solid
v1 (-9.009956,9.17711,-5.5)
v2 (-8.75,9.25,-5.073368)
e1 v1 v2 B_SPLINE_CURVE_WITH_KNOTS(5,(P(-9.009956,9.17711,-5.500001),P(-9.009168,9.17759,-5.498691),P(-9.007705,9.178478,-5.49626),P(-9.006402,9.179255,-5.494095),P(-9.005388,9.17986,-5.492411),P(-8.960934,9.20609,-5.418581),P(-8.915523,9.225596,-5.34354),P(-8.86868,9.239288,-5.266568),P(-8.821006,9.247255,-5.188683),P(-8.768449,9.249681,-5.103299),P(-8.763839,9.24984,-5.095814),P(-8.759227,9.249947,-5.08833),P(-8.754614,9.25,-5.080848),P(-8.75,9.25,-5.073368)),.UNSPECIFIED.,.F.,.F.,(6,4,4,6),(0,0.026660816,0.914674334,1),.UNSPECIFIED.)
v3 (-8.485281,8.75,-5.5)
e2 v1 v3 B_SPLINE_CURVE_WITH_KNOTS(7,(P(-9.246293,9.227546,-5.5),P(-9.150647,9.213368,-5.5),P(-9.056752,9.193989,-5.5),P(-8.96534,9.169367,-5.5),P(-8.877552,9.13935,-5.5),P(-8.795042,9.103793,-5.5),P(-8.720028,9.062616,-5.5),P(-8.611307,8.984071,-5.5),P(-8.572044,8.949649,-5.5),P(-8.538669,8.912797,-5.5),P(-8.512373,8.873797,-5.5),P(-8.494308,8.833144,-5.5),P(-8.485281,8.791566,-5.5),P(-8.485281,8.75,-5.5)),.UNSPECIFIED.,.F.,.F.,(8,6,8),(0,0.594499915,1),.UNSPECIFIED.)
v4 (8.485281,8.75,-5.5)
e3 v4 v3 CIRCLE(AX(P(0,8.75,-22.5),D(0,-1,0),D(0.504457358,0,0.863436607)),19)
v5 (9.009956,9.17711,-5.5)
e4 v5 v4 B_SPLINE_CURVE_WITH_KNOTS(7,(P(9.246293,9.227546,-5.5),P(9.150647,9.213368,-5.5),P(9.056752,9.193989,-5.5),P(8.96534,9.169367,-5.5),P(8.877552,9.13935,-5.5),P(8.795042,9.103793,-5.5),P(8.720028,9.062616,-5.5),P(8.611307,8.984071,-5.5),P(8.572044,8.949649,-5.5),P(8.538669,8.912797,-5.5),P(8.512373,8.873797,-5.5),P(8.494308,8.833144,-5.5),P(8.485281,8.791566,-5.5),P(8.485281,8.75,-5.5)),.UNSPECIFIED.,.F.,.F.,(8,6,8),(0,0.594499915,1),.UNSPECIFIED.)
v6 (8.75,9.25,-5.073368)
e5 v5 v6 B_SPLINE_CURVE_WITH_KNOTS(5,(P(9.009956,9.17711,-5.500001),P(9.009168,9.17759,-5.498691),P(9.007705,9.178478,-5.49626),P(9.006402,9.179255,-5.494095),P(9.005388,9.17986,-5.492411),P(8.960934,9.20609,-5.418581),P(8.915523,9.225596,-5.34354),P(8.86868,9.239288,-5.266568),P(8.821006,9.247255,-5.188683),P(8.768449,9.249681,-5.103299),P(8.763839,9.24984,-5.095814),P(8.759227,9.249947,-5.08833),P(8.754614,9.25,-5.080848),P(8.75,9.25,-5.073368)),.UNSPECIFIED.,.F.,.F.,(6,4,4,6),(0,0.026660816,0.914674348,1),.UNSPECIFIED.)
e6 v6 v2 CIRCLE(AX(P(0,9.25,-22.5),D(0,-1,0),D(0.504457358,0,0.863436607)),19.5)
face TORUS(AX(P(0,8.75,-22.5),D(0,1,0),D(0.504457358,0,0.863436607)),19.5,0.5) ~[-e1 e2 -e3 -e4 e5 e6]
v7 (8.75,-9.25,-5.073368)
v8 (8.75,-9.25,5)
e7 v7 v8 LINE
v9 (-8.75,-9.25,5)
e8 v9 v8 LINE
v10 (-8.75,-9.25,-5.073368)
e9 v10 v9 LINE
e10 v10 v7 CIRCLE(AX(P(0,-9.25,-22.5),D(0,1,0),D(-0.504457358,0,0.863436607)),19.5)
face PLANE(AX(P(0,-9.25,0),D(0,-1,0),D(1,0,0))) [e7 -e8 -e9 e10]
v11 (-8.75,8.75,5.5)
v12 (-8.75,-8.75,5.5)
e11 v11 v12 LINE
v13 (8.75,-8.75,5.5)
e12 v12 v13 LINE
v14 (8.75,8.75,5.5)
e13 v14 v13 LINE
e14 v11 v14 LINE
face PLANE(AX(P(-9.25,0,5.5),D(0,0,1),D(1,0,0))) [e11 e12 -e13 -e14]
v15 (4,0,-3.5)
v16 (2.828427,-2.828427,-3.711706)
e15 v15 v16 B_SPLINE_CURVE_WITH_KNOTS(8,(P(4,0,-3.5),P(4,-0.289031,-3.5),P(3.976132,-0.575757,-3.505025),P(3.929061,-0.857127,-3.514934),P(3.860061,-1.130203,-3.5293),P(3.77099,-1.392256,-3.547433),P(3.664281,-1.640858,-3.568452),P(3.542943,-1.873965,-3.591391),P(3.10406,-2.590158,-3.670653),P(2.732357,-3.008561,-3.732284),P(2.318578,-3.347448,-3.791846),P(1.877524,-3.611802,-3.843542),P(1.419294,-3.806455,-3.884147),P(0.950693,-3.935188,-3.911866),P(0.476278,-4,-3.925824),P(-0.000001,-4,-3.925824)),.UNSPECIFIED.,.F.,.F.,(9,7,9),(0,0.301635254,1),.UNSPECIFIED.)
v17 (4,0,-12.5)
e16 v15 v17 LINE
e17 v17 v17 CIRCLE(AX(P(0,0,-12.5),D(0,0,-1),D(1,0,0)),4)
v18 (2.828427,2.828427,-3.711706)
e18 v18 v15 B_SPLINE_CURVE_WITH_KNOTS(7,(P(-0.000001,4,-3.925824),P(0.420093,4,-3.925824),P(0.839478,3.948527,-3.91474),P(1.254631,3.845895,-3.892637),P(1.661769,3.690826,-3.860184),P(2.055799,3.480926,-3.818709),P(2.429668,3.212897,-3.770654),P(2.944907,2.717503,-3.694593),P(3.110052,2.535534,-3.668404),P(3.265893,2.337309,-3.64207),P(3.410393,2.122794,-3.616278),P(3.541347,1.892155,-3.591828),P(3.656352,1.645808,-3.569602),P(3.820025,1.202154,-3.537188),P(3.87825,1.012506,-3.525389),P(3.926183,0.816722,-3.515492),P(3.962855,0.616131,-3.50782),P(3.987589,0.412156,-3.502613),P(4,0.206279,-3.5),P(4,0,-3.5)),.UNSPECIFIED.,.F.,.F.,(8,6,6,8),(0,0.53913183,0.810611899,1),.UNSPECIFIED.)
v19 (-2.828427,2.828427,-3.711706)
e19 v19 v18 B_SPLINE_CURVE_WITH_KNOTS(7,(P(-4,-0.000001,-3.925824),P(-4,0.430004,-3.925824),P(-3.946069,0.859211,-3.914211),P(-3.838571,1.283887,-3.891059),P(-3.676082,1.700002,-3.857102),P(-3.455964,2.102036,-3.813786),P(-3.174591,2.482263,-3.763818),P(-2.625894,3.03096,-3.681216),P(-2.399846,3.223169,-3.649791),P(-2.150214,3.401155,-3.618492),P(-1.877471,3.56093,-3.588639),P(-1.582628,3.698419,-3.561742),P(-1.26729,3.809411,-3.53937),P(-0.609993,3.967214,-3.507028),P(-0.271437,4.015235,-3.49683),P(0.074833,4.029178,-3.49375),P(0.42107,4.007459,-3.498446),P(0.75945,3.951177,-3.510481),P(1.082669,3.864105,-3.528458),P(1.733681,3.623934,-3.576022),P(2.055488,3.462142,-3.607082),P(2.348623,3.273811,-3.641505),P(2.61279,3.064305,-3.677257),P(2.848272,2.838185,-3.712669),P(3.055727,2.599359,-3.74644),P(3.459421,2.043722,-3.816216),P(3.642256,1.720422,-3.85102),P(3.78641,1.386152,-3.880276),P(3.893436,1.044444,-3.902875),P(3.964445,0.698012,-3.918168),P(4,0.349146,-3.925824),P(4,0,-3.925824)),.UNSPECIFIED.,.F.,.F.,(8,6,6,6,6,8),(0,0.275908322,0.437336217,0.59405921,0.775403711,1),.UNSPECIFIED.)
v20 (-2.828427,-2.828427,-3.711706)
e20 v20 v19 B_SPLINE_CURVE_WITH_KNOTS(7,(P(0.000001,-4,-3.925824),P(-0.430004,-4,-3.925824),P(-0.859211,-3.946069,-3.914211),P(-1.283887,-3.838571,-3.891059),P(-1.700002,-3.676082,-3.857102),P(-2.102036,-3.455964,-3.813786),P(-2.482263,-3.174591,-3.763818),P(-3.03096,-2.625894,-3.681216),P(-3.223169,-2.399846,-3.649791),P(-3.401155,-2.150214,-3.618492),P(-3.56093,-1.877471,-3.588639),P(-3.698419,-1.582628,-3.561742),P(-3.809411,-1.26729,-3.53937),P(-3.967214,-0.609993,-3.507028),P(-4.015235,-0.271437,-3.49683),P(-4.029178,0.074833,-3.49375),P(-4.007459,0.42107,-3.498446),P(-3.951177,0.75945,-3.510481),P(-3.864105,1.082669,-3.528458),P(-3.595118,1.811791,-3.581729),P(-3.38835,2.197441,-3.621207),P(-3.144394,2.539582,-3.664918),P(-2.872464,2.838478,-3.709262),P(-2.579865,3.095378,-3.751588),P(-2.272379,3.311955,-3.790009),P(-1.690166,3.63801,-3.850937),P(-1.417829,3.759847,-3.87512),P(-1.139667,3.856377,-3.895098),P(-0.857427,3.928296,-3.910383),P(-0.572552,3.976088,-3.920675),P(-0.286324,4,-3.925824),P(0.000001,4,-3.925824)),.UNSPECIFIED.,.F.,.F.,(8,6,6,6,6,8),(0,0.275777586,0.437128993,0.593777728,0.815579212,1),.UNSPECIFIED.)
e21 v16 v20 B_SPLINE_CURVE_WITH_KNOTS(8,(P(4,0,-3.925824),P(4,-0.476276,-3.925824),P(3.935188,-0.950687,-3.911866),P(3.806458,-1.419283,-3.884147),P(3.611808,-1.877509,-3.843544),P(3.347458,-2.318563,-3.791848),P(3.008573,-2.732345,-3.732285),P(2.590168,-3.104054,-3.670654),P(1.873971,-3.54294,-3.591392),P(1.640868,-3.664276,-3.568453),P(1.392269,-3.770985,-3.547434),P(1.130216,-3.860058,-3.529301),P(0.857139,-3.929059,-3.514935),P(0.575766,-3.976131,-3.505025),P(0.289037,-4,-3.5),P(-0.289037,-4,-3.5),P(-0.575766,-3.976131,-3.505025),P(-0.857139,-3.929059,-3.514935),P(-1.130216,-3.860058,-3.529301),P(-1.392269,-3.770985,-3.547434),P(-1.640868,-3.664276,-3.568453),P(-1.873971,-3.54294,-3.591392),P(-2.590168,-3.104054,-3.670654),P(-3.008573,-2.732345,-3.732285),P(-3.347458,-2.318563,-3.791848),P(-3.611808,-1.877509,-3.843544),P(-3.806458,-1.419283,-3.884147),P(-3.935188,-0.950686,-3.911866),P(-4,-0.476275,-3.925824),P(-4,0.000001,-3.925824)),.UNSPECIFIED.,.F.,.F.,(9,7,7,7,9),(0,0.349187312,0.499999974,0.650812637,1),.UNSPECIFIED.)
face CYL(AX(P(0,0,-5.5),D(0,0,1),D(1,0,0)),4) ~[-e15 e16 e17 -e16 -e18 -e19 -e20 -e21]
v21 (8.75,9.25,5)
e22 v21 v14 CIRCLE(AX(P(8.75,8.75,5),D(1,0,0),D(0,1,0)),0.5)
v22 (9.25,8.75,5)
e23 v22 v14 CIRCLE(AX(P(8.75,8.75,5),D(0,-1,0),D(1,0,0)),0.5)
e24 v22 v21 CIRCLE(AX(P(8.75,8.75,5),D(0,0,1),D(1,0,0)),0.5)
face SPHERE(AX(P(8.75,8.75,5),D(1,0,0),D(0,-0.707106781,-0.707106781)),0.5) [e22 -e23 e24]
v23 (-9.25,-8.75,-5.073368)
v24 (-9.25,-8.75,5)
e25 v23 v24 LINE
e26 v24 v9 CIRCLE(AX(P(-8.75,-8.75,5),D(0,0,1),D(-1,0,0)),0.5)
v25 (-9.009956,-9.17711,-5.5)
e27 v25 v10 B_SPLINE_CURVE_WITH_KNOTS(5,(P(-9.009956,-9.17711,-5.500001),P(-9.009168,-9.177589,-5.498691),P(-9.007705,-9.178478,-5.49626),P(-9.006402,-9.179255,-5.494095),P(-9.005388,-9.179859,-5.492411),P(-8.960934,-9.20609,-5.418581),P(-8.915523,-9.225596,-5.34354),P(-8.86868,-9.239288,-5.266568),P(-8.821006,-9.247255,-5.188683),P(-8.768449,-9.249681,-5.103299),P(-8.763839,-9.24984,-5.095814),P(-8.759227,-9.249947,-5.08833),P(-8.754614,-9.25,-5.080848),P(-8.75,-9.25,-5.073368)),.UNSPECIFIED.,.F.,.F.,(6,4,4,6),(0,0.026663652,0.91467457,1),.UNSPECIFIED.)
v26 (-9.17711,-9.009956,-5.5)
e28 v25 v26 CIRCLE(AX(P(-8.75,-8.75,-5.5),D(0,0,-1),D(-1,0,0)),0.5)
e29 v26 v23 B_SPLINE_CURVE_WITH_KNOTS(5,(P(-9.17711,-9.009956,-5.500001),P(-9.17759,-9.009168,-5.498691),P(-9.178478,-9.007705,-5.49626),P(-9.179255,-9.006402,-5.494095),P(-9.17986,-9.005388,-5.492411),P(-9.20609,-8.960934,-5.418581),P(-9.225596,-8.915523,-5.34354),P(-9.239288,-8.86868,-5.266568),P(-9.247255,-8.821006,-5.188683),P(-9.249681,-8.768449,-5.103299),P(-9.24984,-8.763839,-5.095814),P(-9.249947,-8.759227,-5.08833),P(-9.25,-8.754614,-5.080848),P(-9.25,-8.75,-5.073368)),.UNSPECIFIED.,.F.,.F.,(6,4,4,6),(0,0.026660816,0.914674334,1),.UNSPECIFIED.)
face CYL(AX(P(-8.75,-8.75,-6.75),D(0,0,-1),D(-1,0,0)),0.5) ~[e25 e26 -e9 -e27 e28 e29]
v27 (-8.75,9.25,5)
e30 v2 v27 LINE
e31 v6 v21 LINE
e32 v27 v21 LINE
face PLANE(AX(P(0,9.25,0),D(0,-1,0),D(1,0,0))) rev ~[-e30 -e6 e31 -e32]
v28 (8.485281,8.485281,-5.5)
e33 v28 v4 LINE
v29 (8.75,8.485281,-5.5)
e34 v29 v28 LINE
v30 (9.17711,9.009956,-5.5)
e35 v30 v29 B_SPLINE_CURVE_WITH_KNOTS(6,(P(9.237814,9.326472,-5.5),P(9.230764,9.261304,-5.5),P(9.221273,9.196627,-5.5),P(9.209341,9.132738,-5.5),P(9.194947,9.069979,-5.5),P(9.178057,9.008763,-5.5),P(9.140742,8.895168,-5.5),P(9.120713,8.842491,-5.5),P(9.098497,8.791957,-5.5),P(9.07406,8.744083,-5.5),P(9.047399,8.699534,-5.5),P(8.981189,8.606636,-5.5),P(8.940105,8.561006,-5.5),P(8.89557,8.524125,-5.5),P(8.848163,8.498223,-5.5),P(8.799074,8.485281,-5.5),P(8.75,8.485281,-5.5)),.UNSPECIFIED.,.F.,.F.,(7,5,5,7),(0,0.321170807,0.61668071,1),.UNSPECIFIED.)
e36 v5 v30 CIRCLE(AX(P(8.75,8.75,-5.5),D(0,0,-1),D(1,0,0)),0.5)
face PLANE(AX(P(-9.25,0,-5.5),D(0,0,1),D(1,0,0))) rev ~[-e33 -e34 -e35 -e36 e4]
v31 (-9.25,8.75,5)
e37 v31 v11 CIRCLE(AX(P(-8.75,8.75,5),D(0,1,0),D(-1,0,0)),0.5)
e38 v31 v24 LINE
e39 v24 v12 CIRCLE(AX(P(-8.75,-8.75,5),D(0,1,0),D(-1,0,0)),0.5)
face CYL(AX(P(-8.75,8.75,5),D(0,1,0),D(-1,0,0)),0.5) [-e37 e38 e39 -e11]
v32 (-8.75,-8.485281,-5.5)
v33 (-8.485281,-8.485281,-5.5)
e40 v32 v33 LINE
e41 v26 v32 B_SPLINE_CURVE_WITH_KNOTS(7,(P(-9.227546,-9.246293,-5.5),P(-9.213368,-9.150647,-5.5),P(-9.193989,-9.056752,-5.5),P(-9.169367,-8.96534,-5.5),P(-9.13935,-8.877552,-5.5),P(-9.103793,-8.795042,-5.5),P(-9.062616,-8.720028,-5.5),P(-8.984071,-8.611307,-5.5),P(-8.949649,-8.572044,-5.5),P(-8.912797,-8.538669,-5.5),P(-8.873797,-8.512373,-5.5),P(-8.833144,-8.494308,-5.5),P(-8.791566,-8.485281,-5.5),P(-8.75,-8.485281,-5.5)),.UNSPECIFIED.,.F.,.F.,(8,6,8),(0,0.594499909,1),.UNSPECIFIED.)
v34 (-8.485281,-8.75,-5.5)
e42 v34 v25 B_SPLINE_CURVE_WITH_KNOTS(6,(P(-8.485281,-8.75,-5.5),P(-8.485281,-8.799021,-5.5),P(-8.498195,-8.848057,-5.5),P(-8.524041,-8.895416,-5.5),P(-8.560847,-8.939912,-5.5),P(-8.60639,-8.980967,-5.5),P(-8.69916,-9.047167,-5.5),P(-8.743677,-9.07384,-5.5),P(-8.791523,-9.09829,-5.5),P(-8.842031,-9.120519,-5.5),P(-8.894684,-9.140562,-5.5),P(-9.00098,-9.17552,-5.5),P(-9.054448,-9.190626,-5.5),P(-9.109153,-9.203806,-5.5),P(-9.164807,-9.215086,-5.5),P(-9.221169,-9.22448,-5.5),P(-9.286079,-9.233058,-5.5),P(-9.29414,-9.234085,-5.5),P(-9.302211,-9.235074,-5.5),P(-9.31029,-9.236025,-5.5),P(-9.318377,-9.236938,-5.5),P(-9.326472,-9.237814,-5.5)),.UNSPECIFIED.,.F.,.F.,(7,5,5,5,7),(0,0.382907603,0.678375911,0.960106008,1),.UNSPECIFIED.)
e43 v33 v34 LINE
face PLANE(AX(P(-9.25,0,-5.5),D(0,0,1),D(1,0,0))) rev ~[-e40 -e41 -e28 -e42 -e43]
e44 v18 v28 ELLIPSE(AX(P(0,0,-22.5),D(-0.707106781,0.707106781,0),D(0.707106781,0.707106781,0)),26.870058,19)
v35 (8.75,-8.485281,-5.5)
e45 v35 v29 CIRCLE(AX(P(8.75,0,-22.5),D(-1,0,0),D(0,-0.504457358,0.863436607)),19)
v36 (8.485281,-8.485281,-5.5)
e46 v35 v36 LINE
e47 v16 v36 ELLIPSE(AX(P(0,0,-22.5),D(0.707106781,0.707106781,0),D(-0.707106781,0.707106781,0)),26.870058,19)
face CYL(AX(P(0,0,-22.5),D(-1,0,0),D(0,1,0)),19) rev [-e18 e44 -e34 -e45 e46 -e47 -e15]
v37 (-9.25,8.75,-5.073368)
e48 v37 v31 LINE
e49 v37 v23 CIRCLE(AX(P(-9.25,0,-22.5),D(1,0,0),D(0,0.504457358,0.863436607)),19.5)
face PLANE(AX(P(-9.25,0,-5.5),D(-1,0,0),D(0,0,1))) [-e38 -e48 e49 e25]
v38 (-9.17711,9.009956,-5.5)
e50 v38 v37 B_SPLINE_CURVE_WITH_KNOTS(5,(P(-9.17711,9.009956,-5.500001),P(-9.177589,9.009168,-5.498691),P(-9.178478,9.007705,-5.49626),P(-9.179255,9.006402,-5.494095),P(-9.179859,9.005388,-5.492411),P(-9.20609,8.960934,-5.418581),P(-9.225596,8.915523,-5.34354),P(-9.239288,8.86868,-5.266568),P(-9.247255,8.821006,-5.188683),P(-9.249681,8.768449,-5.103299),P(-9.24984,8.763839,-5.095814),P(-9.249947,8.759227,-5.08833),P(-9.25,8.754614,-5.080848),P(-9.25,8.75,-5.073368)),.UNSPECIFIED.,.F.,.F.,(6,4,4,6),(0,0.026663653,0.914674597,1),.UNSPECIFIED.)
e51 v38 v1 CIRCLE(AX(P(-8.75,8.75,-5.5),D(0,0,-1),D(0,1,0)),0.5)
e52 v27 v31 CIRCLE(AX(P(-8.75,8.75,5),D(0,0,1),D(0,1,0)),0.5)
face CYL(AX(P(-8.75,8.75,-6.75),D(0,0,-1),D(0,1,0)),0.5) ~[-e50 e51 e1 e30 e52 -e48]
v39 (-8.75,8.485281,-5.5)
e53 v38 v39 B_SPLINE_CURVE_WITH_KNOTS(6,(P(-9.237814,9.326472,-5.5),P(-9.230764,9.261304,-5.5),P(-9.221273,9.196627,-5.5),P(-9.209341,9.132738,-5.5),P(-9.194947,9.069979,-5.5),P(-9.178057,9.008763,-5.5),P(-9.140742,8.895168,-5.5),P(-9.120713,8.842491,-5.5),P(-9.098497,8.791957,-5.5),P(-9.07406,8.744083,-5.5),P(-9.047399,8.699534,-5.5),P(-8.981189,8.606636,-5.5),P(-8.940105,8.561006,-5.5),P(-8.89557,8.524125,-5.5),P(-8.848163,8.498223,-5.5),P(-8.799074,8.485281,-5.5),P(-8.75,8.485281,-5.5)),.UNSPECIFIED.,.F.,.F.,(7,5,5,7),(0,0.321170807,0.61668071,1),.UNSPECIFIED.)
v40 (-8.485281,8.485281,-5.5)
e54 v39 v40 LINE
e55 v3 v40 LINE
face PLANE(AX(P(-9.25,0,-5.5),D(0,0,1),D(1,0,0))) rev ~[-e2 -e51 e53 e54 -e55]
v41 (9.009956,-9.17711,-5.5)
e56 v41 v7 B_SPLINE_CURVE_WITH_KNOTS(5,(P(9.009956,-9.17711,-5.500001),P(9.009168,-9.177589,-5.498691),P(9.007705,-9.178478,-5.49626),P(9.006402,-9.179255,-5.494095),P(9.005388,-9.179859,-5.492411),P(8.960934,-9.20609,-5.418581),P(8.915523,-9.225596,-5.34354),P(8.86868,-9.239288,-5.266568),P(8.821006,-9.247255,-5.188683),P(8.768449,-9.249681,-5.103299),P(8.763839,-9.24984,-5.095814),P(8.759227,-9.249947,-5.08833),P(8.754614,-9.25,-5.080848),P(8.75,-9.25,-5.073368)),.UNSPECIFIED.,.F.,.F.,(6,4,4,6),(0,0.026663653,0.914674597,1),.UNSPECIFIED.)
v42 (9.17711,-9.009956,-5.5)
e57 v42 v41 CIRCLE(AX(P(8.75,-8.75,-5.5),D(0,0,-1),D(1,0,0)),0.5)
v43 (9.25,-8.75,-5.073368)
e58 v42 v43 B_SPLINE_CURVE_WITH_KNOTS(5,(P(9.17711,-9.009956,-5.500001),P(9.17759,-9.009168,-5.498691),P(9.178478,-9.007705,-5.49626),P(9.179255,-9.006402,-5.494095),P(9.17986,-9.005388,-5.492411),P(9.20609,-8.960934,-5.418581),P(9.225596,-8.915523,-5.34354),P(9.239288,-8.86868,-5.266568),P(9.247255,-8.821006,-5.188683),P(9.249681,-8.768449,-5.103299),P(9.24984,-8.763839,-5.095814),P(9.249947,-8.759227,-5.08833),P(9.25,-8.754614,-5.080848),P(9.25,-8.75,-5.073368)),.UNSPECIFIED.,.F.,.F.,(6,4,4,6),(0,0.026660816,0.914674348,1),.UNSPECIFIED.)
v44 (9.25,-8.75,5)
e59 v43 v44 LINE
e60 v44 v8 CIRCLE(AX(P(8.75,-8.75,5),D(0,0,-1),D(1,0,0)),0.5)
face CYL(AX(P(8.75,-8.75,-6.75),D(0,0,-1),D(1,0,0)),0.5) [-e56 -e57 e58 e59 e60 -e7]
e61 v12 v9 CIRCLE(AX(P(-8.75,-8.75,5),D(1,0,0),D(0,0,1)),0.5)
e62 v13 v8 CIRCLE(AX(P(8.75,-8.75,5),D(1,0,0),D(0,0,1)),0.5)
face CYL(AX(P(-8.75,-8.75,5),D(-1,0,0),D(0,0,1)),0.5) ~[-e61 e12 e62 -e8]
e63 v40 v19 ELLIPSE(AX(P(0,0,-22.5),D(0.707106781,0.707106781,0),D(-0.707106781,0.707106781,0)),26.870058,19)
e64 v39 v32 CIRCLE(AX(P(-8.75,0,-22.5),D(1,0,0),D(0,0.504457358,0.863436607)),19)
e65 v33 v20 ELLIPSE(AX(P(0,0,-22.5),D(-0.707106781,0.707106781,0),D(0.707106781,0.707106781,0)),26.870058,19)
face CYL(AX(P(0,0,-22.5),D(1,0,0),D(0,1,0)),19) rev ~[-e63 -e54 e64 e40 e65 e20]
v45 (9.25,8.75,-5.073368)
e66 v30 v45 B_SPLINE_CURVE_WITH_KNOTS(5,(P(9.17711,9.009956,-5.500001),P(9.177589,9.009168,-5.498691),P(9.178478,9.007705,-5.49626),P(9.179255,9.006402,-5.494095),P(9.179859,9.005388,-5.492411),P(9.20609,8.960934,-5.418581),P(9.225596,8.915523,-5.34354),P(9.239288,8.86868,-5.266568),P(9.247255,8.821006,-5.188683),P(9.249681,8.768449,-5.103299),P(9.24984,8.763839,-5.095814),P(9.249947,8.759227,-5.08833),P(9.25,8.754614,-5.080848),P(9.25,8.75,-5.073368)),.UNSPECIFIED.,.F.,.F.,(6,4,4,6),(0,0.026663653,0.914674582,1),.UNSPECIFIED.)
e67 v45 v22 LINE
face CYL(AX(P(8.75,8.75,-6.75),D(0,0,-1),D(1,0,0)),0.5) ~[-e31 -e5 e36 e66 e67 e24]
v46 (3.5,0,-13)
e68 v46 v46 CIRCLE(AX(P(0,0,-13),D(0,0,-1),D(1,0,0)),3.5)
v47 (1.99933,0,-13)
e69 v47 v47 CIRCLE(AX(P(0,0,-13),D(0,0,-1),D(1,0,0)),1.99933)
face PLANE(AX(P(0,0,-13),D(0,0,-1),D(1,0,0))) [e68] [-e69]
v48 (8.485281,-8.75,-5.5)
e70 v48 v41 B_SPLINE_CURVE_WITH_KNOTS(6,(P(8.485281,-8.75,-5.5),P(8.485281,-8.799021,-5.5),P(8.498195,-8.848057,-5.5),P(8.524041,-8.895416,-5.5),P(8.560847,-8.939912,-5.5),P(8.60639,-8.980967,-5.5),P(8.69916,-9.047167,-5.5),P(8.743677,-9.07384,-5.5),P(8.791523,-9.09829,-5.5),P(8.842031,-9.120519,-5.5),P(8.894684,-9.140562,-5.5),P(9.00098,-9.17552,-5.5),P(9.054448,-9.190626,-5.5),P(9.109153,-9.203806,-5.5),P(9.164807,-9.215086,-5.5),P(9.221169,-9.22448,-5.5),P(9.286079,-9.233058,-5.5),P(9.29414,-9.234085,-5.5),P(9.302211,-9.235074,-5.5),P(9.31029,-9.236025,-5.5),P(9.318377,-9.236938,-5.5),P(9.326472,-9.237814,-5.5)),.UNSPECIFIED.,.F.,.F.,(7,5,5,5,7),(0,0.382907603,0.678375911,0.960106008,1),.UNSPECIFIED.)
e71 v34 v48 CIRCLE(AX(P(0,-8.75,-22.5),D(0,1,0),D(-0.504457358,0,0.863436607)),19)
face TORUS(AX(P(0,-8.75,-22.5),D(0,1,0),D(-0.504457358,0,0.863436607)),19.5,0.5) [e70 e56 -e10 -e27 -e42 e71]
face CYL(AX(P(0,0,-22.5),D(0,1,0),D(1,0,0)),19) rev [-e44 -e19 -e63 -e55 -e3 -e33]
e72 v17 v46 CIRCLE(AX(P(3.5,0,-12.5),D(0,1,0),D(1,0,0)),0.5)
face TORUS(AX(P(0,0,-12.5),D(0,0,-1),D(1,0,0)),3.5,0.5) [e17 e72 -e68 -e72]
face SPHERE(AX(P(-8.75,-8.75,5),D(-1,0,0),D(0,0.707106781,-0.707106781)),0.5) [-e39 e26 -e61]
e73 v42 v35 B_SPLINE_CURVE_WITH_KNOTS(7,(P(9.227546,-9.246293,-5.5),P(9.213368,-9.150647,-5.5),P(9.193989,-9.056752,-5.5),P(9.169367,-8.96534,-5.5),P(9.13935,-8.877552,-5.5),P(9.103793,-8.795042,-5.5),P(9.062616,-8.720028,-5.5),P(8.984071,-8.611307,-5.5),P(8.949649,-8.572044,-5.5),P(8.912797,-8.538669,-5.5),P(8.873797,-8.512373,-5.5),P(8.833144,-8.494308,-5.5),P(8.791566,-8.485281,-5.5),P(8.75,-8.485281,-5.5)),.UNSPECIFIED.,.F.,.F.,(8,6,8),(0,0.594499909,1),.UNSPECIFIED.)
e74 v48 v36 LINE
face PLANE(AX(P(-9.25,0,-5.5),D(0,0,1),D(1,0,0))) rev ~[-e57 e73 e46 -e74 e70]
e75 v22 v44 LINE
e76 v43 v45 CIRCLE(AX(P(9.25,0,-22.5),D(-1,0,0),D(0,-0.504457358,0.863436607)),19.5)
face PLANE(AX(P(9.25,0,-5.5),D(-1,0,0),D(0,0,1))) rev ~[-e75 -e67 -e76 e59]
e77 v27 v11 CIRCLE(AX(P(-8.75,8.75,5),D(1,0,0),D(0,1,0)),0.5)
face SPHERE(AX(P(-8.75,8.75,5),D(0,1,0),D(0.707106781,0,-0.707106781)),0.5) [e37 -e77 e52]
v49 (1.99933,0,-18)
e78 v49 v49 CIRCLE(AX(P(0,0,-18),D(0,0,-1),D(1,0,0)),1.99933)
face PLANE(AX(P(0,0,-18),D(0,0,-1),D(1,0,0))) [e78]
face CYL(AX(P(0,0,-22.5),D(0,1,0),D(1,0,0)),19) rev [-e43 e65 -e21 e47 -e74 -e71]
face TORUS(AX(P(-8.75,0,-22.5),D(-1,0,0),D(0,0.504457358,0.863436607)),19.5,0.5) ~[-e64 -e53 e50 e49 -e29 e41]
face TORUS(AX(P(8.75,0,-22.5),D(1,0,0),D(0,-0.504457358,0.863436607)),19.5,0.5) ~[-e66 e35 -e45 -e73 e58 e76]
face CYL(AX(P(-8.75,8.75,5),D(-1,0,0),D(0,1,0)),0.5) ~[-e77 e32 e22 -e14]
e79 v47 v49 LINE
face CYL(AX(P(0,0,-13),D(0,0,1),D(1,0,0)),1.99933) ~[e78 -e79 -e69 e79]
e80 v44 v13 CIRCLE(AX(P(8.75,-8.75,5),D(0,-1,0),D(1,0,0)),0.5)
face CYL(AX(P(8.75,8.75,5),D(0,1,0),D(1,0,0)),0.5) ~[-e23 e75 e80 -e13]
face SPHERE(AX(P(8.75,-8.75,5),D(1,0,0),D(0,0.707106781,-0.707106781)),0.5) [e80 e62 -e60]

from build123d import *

# Parameters (mm, degrees)
F0_W          = 18.5
F0_H          = 11
F1_DEPTH      = 9.25
F2_DEPTH      = 9.25
F3_R          = 19
F5_DEPTH      = 25.4
F6_DEPTH      = 25.4
F4_R          = 19
F7_DEPTH      = 25.4
F8_DEPTH      = 25.4
F9_R          = 4
F10_DEPTH     = 3.45753
F11_DEPTH     = 7.5
F12_T1_DEPTH  = 11.75
F12_T3_DEPTH  = 17.5
F12_T5_DEPTH  = 17.5
F12_S9_W      = 0.5
F12_S9_H      = 0.5
F12_T10_DEPTH = 0.5
F12_S15_W     = 0.5
F12_S15_H     = 0.5
F12_T16_DEPTH = 0.5
F12_S21_W     = 0.5
F12_S21_H     = 0.5
F12_T22_DEPTH = 0.5
F12_S27_W     = 0.5
F12_S27_H     = 0.5
F12_T28_DEPTH = 0.5
F12_T34_ANGLE = 60.5906744424
F12_T36_ANGLE = 60.5906744424
F12_T38_ANGLE = 60.5906744424
F12_T40_ANGLE = 60.5906744424
F13_R         = 1.9993297739
F14_DEPTH     = 5


# Not quite as in the source:
# - a fillet or chamfer that OpenCascade refuses, or shapes differently, is made with other operations: its cross-section is extruded or revolved along the edge and cut away or added
# - a feature names something its author has since deleted; it is built from what else it names


with BuildPart() as f1:
    # F0 (on Front) → F1 (new body)
    with BuildSketch(Plane.XZ):
        Rectangle(F0_W, F0_H)
    extrude(amount=-F1_DEPTH)

    # F0 (on Front) → F2 (join)
    with BuildSketch(Plane.XZ):
        Rectangle(F0_W, F0_H)
    extrude(amount=F2_DEPTH)

    # F3 (on Front) → F5 (cut)
    with BuildSketch(Plane.XZ):
        with Locations((0, -22.5)):
            Circle(F3_R)
    extrude(amount=-F5_DEPTH, mode=Mode.SUBTRACT)

    # F3 (on Front) → F6 (cut)
    with BuildSketch(Plane.XZ):
        with Locations((0, -22.5)):
            Circle(F3_R)
    extrude(amount=F6_DEPTH, mode=Mode.SUBTRACT)

    # F4 (on Right) → F7 (cut)
    with BuildSketch(Plane.YZ):
        with Locations((0, -22.5)):
            Circle(F4_R)
    extrude(amount=-F7_DEPTH, mode=Mode.SUBTRACT)

    # F4 (on Right) → F8 (cut)
    with BuildSketch(Plane.YZ):
        with Locations((0, -22.5)):
            Circle(F4_R)
    extrude(amount=F8_DEPTH, mode=Mode.SUBTRACT)

    # F9 (on face) → F10 (join)
    with BuildSketch(Plane(origin=(0, 0, -5.5), x_dir=(1, 0, 0), z_dir=(0, 0, -1))):
        Circle(F9_R)
    extrude(amount=-F10_DEPTH)

    # F11 (add): a face of the model
    f11_faces = [f1.faces().sort_by_distance(p)[0] for p in [
        (0, 0, -5.5),
    ]]
    extrude(f11_faces, amount=F11_DEPTH)

    # F12: fillet of radius 0.5 on 13 edges, made by hand

    # F12_s2 → F12_t1 (cut)
    with BuildSketch(Plane.XY.offset(-6.75)):
        with BuildLine():
            ThreePointArc((9.25, -8.75), (9.1035533906, -9.1035533906), (8.75, -9.25))
            Line((8.75, -9.25), (9.25, -9.25))
            Line((9.25, -9.25), (9.25, -8.75))
        make_face()
        with BuildLine():
            ThreePointArc((-9.25, -8.75), (-9.1035533906, -9.1035533906), (-8.75, -9.25))
            Line((-8.75, -9.25), (-9.25, -9.25))
            Line((-9.25, -9.25), (-9.25, -8.75))
        make_face()
        with BuildLine():
            ThreePointArc((9.25, 8.75), (9.1035533906, 9.1035533906), (8.75, 9.25))
            Line((8.75, 9.25), (9.25, 9.25))
            Line((9.25, 9.25), (9.25, 8.75))
        make_face()
        with BuildLine():
            ThreePointArc((-8.75, 9.25), (-9.1035533906, 9.1035533906), (-9.25, 8.75))
            Line((-9.25, 8.75), (-9.25, 9.25))
            Line((-9.25, 9.25), (-8.75, 9.25))
        make_face()
    extrude(amount=F12_T1_DEPTH, mode=Mode.SUBTRACT)

    # F12_s4 → F12_t3 (cut)
    with BuildSketch(Plane.YZ.offset(-8.75)):
        with BuildLine():
            ThreePointArc((-8.75, 5.5), (-9.1035533906, 5.3535533906), (-9.25, 5))
            Line((-9.25, 5), (-9.25, 5.5))
            Line((-9.25, 5.5), (-8.75, 5.5))
        make_face()
        with BuildLine():
            ThreePointArc((9.25, 5), (9.1035533906, 5.3535533906), (8.75, 5.5))
            Line((8.75, 5.5), (9.25, 5.5))
            Line((9.25, 5.5), (9.25, 5))
        make_face()
    extrude(amount=F12_T3_DEPTH, mode=Mode.SUBTRACT)

    # F12_s6 → F12_t5 (cut)
    with BuildSketch(Plane.XZ.offset(-8.75)):
        with BuildLine():
            ThreePointArc((9.25, 5), (9.1035533906, 5.3535533906), (8.75, 5.5))
            Line((8.75, 5.5), (9.25, 5.5))
            Line((9.25, 5.5), (9.25, 5))
        make_face()
        with BuildLine():
            ThreePointArc((-9.25, 5), (-9.1035533906, 5.3535533906), (-8.75, 5.5))
            Line((-8.75, 5.5), (-9.25, 5.5))
            Line((-9.25, 5.5), (-9.25, 5))
        make_face()
    extrude(amount=F12_T5_DEPTH, mode=Mode.SUBTRACT)


with BuildPart() as f12_tool8:
    # F12_s9 → F12_t10 (new body)
    with BuildSketch(Plane.YZ.offset(8.75)):
        with Locations((-9, 5.25)):
            Rectangle(F12_S9_W, F12_S9_H)
    extrude(amount=F12_T10_DEPTH)

    # F12_s11 → F12_t12 (revolve, cut)
    with BuildSketch(Plane(origin=(8.75, -8.75, 5), x_dir=(0, 0.7071067812, -0.7071067812), z_dir=(0, -0.7071067812, -0.7071067812))):
        with BuildLine():
            ThreePointArc((0, -0.5), (0.5, 0), (0, 0.5))
            Line((0, 0.5), (0, -0.5))
        make_face()
    revolve(axis=Axis((8.75, -8.75, 5), (1, 0, 0)), mode=Mode.SUBTRACT)


with BuildPart() as f1_1:
    add(f1.part)

    # F12_t7: cut F12_tool8
    add(f12_tool8.part, mode=Mode.SUBTRACT)


with BuildPart() as f12_tool14:
    # F12_s15 → F12_t16 (new body)
    with BuildSketch(Plane.YZ.offset(-8.75)):
        with Locations((-9, 5.25)):
            Rectangle(F12_S15_W, F12_S15_H)
    extrude(amount=-F12_T16_DEPTH)

    # F12_s17 → F12_t18 (revolve, cut)
    with BuildSketch(Plane(origin=(-8.75, -8.75, 5), x_dir=(0, 0.7071067812, -0.7071067812), z_dir=(0, 0.7071067812, 0.7071067812))):
        with BuildLine():
            ThreePointArc((0, -0.5), (0.5, 0), (0, 0.5))
            Line((0, 0.5), (0, -0.5))
        make_face()
    revolve(axis=Axis((-8.75, -8.75, 5), (-1, 0, 0)), mode=Mode.SUBTRACT)


with BuildPart() as f1_2:
    add(f1_1.part)

    # F12_t13: cut F12_tool14
    add(f12_tool14.part, mode=Mode.SUBTRACT)


with BuildPart() as f12_tool20:
    # F12_s21 → F12_t22 (new body)
    with BuildSketch(Plane.YZ.offset(8.75)):
        with Locations((9, 5.25)):
            Rectangle(F12_S21_W, F12_S21_H)
    extrude(amount=F12_T22_DEPTH)

    # F12_s23 → F12_t24 (revolve, cut)
    with BuildSketch(Plane(origin=(8.75, 8.75, 5), x_dir=(0, -0.7071067812, -0.7071067812), z_dir=(0, -0.7071067812, 0.7071067812))):
        with BuildLine():
            ThreePointArc((0, -0.5), (0.5, 0), (0, 0.5))
            Line((0, 0.5), (0, -0.5))
        make_face()
    revolve(axis=Axis((8.75, 8.75, 5), (1, 0, 0)), mode=Mode.SUBTRACT)


with BuildPart() as f1_3:
    add(f1_2.part)

    # F12_t19: cut F12_tool20
    add(f12_tool20.part, mode=Mode.SUBTRACT)


with BuildPart() as f12_tool26:
    # F12_s27 → F12_t28 (new body)
    with BuildSketch(Plane.XZ.offset(-8.75)):
        with Locations((-9, 5.25)):
            Rectangle(F12_S27_W, F12_S27_H)
    extrude(amount=-F12_T28_DEPTH)

    # F12_s29 → F12_t30 (revolve, cut)
    with BuildSketch(Plane(origin=(-8.75, 8.75, 5), x_dir=(0.7071067812, 0, -0.7071067812), z_dir=(0.7071067812, 0, 0.7071067812))):
        with BuildLine():
            ThreePointArc((0, -0.5), (0.5, 0), (0, 0.5))
            Line((0, 0.5), (0, -0.5))
        make_face()
    revolve(axis=Axis((-8.75, 8.75, 5), (0, 1, 0)), mode=Mode.SUBTRACT)


with BuildPart() as f1_4:
    add(f1_3.part)

    # F12_t25: cut F12_tool26
    add(f12_tool26.part, mode=Mode.SUBTRACT)

    # F12_s31 → F12_t32 (revolve, cut)
    with BuildSketch(Plane.XZ):
        with BuildLine():
            ThreePointArc((4, -12.5), (3.8535533906, -12.8535533906), (3.5, -13))
            Line((3.5, -13), (4, -13))
            Line((4, -13), (4, -12.5))
        make_face()
    revolve(axis=Axis((0, 0, -13), (0, 0, -1)), mode=Mode.SUBTRACT)

    # F12_s33 → F12_t34 (revolve, cut)
    with BuildSketch(Plane(origin=(-9.8002563667, 0, -5.7257375924), x_dir=(0, 1, 0), z_dir=(-0.8634366066, 0, -0.5044573583))):
        with BuildLine():
            ThreePointArc((-8.75, 0.4273236492), (-9.1035533906, 0.2808770398), (-9.25, -0.0726763508))
            Line((-9.25, -0.0726763508), (-9.25, 0.4273236492))
            Line((-9.25, 0.4273236492), (-8.75, 0.4273236492))
        make_face()
    revolve(axis=Axis((0, -9.25, -22.5), (0, 1, 0)), revolution_arc=F12_T34_ANGLE, mode=Mode.SUBTRACT)

    # F12_s35 → F12_t36 (revolve, cut)
    with BuildSketch(Plane(origin=(0, 9.8002563667, -5.7257375924), x_dir=(1, 0, 0), z_dir=(0, 0.8634366066, -0.5044573583))):
        with BuildLine():
            ThreePointArc((-9.25, -0.0726763508), (-9.1035533906, 0.2808770398), (-8.75, 0.4273236492))
            Line((-8.75, 0.4273236492), (-9.25, 0.4273236492))
            Line((-9.25, 0.4273236492), (-9.25, -0.0726763508))
        make_face()
    revolve(axis=Axis((-9.25, 0, -22.5), (1, 0, 0)), revolution_arc=F12_T36_ANGLE, mode=Mode.SUBTRACT)

    # F12_s37 → F12_t38 (revolve, cut)
    with BuildSketch(Plane(origin=(0, -9.8002563667, -5.7257375924), x_dir=(1, 0, 0), z_dir=(0, -0.8634366066, -0.5044573583))):
        with BuildLine():
            ThreePointArc((9.25, 0.0726763508), (9.1035533906, -0.2808770398), (8.75, -0.4273236492))
            Line((8.75, -0.4273236492), (9.25, -0.4273236492))
            Line((9.25, -0.4273236492), (9.25, 0.0726763508))
        make_face()
    revolve(axis=Axis((9.25, 0, -22.5), (-1, 0, 0)), revolution_arc=F12_T38_ANGLE, mode=Mode.SUBTRACT)

    # F12_s39 → F12_t40 (revolve, cut)
    with BuildSketch(Plane(origin=(9.8002563667, 0, -5.7257375924), x_dir=(0, 1, 0), z_dir=(0.8634366066, 0, -0.5044573583))):
        with BuildLine():
            ThreePointArc((9.25, 0.0726763508), (9.1035533906, -0.2808770398), (8.75, -0.4273236492))
            Line((8.75, -0.4273236492), (9.25, -0.4273236492))
            Line((9.25, -0.4273236492), (9.25, 0.0726763508))
        make_face()
    revolve(axis=Axis((0, 9.25, -22.5), (0, -1, 0)), revolution_arc=F12_T40_ANGLE, mode=Mode.SUBTRACT)

    # F13 (on face) → F14 (join)
    with BuildSketch(Plane(origin=(0, 0, -13), x_dir=(1, 0, 0), z_dir=(0, 0, -1))):
        Circle(F13_R)
    extrude(amount=F14_DEPTH)


solid = f1_4.part
